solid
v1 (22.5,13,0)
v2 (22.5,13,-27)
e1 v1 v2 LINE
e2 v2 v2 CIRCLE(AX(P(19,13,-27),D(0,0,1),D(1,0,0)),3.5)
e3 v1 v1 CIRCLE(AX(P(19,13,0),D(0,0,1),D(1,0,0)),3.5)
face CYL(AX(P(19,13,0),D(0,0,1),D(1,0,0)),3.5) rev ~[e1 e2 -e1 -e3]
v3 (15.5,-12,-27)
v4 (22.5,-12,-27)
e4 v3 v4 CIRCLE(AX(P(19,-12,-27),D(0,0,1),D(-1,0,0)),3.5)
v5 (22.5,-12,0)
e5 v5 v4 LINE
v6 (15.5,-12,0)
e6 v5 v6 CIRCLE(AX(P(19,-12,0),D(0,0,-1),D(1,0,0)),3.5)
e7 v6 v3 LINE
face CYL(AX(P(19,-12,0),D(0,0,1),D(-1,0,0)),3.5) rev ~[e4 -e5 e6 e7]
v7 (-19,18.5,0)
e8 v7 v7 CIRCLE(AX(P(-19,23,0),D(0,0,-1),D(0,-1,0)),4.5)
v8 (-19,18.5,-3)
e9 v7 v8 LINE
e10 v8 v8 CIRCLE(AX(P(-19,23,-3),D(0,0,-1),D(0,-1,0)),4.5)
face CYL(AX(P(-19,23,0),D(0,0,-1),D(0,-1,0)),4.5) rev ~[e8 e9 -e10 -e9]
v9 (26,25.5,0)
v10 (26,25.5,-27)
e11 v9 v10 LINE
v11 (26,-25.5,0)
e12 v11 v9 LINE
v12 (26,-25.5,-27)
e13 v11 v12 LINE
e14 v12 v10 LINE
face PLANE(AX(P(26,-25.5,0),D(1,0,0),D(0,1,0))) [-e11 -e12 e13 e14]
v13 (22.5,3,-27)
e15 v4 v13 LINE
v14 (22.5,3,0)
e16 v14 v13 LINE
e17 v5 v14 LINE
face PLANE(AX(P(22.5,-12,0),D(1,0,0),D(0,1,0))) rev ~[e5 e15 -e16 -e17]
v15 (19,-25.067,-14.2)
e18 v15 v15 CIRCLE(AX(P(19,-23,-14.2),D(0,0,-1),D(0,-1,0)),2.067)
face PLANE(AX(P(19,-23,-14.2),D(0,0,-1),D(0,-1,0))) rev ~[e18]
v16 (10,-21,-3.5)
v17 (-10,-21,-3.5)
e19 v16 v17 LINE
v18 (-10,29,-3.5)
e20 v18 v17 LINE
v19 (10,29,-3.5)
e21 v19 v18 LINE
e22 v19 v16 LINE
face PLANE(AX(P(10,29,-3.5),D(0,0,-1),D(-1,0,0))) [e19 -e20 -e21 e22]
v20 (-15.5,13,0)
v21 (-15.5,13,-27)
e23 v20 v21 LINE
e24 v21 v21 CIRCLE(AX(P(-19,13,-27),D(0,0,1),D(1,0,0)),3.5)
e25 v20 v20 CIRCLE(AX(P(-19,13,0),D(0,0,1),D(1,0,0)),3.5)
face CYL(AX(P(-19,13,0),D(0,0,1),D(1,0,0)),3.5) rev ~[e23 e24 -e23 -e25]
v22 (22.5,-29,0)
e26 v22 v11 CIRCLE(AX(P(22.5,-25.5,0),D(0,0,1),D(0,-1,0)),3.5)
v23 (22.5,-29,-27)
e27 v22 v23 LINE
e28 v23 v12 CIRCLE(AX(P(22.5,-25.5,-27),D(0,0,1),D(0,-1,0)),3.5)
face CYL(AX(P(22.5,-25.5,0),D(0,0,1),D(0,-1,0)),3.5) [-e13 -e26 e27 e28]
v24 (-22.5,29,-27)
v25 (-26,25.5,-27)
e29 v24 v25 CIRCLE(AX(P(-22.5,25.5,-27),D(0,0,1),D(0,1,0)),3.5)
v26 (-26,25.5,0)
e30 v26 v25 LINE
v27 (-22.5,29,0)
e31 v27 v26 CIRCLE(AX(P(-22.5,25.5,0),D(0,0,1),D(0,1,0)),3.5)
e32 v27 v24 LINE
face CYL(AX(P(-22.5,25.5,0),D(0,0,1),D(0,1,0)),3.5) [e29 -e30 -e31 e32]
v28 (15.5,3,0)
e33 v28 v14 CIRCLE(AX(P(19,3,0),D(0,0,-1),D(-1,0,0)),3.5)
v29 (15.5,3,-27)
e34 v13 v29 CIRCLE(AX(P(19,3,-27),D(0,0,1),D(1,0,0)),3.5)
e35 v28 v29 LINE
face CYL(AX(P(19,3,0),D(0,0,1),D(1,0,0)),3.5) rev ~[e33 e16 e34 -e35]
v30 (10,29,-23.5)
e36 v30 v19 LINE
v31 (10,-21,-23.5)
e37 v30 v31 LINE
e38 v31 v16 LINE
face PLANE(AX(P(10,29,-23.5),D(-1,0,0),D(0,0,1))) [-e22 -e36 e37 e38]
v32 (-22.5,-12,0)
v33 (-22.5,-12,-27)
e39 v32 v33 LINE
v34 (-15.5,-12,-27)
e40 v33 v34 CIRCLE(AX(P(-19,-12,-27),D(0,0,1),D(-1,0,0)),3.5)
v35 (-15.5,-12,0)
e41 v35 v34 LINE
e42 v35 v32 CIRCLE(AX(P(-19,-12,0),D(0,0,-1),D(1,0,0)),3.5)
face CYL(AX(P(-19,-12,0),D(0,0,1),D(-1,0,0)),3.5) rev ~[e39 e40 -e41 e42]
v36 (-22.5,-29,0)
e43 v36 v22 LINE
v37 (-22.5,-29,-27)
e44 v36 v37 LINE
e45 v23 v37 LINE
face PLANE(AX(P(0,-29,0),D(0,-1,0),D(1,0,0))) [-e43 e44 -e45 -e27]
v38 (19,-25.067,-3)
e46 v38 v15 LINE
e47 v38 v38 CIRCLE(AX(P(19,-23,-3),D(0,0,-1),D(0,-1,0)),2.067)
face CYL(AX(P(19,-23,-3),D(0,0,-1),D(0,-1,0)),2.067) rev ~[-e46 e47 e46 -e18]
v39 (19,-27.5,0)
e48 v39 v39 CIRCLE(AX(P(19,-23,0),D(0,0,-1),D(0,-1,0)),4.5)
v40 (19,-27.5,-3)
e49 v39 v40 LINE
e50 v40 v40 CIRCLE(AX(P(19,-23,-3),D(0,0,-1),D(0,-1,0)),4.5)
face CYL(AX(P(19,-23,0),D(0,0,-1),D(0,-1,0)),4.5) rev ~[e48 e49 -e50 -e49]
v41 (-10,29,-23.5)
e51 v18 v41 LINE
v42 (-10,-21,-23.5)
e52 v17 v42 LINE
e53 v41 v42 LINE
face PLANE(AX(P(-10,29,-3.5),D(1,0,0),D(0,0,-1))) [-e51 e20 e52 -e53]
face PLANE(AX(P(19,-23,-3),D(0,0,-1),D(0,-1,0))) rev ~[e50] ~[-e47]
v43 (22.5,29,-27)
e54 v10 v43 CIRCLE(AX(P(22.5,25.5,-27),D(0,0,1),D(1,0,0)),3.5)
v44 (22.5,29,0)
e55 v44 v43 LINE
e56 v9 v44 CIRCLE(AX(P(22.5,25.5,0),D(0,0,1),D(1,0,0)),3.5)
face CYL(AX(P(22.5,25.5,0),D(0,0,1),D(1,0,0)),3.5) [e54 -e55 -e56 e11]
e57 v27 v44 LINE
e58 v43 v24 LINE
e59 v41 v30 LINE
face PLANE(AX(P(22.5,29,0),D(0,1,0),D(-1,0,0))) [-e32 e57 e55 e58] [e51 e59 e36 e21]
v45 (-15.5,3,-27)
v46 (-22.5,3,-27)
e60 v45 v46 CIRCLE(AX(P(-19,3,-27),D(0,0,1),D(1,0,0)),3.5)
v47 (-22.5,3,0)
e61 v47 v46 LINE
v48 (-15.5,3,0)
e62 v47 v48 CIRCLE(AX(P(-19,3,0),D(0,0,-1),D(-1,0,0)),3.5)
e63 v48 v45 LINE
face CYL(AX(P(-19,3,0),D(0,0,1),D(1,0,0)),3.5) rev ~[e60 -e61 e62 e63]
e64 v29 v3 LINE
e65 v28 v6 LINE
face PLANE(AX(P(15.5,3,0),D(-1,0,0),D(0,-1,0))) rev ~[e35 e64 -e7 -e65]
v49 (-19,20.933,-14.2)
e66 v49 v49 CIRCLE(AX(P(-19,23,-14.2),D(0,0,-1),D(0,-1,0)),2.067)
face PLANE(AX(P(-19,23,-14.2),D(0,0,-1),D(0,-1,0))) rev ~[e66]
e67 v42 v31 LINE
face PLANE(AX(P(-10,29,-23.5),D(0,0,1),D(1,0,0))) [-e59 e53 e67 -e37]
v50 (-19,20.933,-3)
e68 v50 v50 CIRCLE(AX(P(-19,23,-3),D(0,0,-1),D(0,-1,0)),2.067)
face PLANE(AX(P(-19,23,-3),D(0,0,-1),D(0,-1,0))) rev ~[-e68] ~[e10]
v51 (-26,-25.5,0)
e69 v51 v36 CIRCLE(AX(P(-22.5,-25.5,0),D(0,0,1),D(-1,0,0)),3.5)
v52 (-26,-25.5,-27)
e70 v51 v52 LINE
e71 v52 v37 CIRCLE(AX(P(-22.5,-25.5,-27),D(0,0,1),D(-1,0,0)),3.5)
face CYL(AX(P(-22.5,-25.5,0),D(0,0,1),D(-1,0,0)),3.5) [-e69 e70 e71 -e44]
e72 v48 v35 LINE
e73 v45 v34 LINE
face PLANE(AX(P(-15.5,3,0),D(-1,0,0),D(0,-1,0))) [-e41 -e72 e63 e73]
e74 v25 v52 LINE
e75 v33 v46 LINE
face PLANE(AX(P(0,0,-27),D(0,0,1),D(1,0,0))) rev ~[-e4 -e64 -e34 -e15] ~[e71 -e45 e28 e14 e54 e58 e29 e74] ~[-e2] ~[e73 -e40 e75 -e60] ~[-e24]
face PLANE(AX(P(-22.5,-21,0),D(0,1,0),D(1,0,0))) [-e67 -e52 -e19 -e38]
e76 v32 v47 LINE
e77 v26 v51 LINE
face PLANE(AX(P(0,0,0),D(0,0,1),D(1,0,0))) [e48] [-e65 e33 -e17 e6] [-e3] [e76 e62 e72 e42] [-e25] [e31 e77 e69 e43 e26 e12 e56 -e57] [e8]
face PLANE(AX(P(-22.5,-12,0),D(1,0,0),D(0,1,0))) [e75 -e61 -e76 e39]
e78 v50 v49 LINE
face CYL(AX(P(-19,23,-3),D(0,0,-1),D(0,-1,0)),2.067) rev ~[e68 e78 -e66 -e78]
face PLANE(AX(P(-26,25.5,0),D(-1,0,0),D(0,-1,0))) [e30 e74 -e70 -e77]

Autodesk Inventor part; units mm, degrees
ref_plane "YZ Plane" through (0, 0, 0) normal (1, 0, 0) x (0, 1, 0)
ref_plane "XZ Plane" through (0, 0, 0) normal (0, 1, 0) x (-1, 0, 0)
ref_plane "XY Plane" through (0, 0, 0) normal (0, 0, 1) x (1, 0, 0)
sketch "Esquisse1" plane through (0, 0, 0) normal (0, 0, 1) x (1, 0, 0)
  line L0 (22.5, 29) -> (-22.5, 29)
  line L1 (-26, 25.5) -> (-26, -25.5)
  line L2 (-22.5, -29) -> (22.5, -29)
  line L3 (26, -25.5) -> (26, 25.5)
  line L4 (26, 29) -> (-26, -29) construction
  line L5 (-26, 29) -> (26, -29) construction
  line L6 (-19, 6.5) -> (-19, 6.5)
  line L7 (-15.5, 3) -> (-15.5, -12)
  line L8 (-19, -15.5) -> (-19, -15.5)
  line L9 (-22.5, -12) -> (-22.5, 3)
  line L10 (-22.5, 6.5) -> (-15.5, -15.5) construction
  line L11 (-15.5, 6.5) -> (-22.5, -15.5) construction
  circle A0 centre (-19, 13) radius 3.5
  arc A1 (-22.5, -12) -> (-19, -15.5) centre (-19, -12) ccw
  arc A2 (-19, -15.5) -> (-15.5, -12) centre (-19, -12) ccw
  arc A3 (-19, 6.5) -> (-22.5, 3) centre (-19, 3) ccw
  arc A4 (-15.5, 3) -> (-19, 6.5) centre (-19, 3) ccw
  line L12 (0, 45.9017) -> (0, -37.4412)
  line L13 (15.5, 3) -> (15.5, -12)
  line L14 (22.5, -12) -> (22.5, 3)
  circle A5 centre (19, 13) radius 3.5
  arc A6 (19, -15.5) -> (22.5, -12) centre (19, -12) ccw
  arc A7 (15.5, -12) -> (19, -15.5) centre (19, -12) ccw
  arc A8 (22.5, 3) -> (19, 6.5) centre (19, 3) ccw
  arc A9 (19, 6.5) -> (15.5, 3) centre (19, 3) ccw
  arc A10 (-26, -25.5) -> (-22.5, -29) centre (-22.5, -25.5) ccw
  arc A11 (-22.5, 29) -> (-26, 25.5) centre (-22.5, 25.5) ccw
  arc A12 (26, 25.5) -> (22.5, 29) centre (22.5, 25.5) ccw
  arc A13 (22.5, -29) -> (26, -25.5) centre (22.5, -25.5) ccw
  point P0 (0, 0)
  point P1 (-19, -4.5)
  point P2 (19, -15.5)
  point P3 (19, 6.5)
  point P4 (-19, 6.5)
  point P5 (-19, -15.5)
  dimension "d0" = 52
  dimension "d1" = 58
  dimension "d2" = 7
  dimension "d5" = 3.5
  dimension "d6" = 7
  dimension "d7" = 42
  dimension "d8" = 3.5
  dimension "d9" = 15
  dimension "d10" = 17
  dimension "d12" = 0
  dimension "d13" = 3.5
extrude "Extrusion1" add sketch "Esquisse1" against normal blind 27
sketch "Esquisse2" plane through (0, 0, 0) normal (0, 0, 1) x (1, 0, 0)
  line L0 (-22.5, -29) -> (22.5, -29) projected
  circle A0 centre (19, 13) radius 3.5 projected
  line L1 (19, 13) -> (19, -23)
  circle A1 centre (-19, 13) radius 3.5 projected
  line L2 (-19, 13) -> (-19, 23)
  line L3 (22.5, 29) -> (-22.5, 29) projected
  point P0 (0, 0)
  dimension "d23" = 6
  dimension "d25" = 6
hole "Perçage1" at (19, -23, 0) at (-19, 23, 0) direction (0, 0, -1) diameter 4.134 depth 14.2 counterbore diameter 9 counterbore depth 3 thread size "M5x0.8" class "6H" standard "ANSI Metric M Profile"
sketch "Esquisse3" plane through (-22.5, 29, 0) normal (0, 1, 0) x (1, 0, 0)
  line L0 (45, 0) -> (0, 0) projected
  line L1 (45, 0) -> (45, 27) projected
  line L2 (0, 27) -> (45, 27) projected
  line L3 (0, 0) -> (0, 27) projected
  line L4 (32.5, 3.5) -> (12.5, 3.5)
  line L5 (12.5, 3.5) -> (12.5, 23.5)
  line L6 (12.5, 23.5) -> (32.5, 23.5)
  line L7 (32.5, 23.5) -> (32.5, 3.5)
  line L8 (32.5, 3.5) -> (12.5, 23.5) construction
  line L9 (12.5, 3.5) -> (32.5, 23.5) construction
  point P0 (22.5, 0)
  point P1 (22.5, 13.5)
  dimension "d26" = 20
  dimension "d27" = 20
extrude "Extrusion2" cut sketch "Esquisse3" against normal blind 50 contours L4 L5 L6 L7
properties part number "SupportTendeur"
